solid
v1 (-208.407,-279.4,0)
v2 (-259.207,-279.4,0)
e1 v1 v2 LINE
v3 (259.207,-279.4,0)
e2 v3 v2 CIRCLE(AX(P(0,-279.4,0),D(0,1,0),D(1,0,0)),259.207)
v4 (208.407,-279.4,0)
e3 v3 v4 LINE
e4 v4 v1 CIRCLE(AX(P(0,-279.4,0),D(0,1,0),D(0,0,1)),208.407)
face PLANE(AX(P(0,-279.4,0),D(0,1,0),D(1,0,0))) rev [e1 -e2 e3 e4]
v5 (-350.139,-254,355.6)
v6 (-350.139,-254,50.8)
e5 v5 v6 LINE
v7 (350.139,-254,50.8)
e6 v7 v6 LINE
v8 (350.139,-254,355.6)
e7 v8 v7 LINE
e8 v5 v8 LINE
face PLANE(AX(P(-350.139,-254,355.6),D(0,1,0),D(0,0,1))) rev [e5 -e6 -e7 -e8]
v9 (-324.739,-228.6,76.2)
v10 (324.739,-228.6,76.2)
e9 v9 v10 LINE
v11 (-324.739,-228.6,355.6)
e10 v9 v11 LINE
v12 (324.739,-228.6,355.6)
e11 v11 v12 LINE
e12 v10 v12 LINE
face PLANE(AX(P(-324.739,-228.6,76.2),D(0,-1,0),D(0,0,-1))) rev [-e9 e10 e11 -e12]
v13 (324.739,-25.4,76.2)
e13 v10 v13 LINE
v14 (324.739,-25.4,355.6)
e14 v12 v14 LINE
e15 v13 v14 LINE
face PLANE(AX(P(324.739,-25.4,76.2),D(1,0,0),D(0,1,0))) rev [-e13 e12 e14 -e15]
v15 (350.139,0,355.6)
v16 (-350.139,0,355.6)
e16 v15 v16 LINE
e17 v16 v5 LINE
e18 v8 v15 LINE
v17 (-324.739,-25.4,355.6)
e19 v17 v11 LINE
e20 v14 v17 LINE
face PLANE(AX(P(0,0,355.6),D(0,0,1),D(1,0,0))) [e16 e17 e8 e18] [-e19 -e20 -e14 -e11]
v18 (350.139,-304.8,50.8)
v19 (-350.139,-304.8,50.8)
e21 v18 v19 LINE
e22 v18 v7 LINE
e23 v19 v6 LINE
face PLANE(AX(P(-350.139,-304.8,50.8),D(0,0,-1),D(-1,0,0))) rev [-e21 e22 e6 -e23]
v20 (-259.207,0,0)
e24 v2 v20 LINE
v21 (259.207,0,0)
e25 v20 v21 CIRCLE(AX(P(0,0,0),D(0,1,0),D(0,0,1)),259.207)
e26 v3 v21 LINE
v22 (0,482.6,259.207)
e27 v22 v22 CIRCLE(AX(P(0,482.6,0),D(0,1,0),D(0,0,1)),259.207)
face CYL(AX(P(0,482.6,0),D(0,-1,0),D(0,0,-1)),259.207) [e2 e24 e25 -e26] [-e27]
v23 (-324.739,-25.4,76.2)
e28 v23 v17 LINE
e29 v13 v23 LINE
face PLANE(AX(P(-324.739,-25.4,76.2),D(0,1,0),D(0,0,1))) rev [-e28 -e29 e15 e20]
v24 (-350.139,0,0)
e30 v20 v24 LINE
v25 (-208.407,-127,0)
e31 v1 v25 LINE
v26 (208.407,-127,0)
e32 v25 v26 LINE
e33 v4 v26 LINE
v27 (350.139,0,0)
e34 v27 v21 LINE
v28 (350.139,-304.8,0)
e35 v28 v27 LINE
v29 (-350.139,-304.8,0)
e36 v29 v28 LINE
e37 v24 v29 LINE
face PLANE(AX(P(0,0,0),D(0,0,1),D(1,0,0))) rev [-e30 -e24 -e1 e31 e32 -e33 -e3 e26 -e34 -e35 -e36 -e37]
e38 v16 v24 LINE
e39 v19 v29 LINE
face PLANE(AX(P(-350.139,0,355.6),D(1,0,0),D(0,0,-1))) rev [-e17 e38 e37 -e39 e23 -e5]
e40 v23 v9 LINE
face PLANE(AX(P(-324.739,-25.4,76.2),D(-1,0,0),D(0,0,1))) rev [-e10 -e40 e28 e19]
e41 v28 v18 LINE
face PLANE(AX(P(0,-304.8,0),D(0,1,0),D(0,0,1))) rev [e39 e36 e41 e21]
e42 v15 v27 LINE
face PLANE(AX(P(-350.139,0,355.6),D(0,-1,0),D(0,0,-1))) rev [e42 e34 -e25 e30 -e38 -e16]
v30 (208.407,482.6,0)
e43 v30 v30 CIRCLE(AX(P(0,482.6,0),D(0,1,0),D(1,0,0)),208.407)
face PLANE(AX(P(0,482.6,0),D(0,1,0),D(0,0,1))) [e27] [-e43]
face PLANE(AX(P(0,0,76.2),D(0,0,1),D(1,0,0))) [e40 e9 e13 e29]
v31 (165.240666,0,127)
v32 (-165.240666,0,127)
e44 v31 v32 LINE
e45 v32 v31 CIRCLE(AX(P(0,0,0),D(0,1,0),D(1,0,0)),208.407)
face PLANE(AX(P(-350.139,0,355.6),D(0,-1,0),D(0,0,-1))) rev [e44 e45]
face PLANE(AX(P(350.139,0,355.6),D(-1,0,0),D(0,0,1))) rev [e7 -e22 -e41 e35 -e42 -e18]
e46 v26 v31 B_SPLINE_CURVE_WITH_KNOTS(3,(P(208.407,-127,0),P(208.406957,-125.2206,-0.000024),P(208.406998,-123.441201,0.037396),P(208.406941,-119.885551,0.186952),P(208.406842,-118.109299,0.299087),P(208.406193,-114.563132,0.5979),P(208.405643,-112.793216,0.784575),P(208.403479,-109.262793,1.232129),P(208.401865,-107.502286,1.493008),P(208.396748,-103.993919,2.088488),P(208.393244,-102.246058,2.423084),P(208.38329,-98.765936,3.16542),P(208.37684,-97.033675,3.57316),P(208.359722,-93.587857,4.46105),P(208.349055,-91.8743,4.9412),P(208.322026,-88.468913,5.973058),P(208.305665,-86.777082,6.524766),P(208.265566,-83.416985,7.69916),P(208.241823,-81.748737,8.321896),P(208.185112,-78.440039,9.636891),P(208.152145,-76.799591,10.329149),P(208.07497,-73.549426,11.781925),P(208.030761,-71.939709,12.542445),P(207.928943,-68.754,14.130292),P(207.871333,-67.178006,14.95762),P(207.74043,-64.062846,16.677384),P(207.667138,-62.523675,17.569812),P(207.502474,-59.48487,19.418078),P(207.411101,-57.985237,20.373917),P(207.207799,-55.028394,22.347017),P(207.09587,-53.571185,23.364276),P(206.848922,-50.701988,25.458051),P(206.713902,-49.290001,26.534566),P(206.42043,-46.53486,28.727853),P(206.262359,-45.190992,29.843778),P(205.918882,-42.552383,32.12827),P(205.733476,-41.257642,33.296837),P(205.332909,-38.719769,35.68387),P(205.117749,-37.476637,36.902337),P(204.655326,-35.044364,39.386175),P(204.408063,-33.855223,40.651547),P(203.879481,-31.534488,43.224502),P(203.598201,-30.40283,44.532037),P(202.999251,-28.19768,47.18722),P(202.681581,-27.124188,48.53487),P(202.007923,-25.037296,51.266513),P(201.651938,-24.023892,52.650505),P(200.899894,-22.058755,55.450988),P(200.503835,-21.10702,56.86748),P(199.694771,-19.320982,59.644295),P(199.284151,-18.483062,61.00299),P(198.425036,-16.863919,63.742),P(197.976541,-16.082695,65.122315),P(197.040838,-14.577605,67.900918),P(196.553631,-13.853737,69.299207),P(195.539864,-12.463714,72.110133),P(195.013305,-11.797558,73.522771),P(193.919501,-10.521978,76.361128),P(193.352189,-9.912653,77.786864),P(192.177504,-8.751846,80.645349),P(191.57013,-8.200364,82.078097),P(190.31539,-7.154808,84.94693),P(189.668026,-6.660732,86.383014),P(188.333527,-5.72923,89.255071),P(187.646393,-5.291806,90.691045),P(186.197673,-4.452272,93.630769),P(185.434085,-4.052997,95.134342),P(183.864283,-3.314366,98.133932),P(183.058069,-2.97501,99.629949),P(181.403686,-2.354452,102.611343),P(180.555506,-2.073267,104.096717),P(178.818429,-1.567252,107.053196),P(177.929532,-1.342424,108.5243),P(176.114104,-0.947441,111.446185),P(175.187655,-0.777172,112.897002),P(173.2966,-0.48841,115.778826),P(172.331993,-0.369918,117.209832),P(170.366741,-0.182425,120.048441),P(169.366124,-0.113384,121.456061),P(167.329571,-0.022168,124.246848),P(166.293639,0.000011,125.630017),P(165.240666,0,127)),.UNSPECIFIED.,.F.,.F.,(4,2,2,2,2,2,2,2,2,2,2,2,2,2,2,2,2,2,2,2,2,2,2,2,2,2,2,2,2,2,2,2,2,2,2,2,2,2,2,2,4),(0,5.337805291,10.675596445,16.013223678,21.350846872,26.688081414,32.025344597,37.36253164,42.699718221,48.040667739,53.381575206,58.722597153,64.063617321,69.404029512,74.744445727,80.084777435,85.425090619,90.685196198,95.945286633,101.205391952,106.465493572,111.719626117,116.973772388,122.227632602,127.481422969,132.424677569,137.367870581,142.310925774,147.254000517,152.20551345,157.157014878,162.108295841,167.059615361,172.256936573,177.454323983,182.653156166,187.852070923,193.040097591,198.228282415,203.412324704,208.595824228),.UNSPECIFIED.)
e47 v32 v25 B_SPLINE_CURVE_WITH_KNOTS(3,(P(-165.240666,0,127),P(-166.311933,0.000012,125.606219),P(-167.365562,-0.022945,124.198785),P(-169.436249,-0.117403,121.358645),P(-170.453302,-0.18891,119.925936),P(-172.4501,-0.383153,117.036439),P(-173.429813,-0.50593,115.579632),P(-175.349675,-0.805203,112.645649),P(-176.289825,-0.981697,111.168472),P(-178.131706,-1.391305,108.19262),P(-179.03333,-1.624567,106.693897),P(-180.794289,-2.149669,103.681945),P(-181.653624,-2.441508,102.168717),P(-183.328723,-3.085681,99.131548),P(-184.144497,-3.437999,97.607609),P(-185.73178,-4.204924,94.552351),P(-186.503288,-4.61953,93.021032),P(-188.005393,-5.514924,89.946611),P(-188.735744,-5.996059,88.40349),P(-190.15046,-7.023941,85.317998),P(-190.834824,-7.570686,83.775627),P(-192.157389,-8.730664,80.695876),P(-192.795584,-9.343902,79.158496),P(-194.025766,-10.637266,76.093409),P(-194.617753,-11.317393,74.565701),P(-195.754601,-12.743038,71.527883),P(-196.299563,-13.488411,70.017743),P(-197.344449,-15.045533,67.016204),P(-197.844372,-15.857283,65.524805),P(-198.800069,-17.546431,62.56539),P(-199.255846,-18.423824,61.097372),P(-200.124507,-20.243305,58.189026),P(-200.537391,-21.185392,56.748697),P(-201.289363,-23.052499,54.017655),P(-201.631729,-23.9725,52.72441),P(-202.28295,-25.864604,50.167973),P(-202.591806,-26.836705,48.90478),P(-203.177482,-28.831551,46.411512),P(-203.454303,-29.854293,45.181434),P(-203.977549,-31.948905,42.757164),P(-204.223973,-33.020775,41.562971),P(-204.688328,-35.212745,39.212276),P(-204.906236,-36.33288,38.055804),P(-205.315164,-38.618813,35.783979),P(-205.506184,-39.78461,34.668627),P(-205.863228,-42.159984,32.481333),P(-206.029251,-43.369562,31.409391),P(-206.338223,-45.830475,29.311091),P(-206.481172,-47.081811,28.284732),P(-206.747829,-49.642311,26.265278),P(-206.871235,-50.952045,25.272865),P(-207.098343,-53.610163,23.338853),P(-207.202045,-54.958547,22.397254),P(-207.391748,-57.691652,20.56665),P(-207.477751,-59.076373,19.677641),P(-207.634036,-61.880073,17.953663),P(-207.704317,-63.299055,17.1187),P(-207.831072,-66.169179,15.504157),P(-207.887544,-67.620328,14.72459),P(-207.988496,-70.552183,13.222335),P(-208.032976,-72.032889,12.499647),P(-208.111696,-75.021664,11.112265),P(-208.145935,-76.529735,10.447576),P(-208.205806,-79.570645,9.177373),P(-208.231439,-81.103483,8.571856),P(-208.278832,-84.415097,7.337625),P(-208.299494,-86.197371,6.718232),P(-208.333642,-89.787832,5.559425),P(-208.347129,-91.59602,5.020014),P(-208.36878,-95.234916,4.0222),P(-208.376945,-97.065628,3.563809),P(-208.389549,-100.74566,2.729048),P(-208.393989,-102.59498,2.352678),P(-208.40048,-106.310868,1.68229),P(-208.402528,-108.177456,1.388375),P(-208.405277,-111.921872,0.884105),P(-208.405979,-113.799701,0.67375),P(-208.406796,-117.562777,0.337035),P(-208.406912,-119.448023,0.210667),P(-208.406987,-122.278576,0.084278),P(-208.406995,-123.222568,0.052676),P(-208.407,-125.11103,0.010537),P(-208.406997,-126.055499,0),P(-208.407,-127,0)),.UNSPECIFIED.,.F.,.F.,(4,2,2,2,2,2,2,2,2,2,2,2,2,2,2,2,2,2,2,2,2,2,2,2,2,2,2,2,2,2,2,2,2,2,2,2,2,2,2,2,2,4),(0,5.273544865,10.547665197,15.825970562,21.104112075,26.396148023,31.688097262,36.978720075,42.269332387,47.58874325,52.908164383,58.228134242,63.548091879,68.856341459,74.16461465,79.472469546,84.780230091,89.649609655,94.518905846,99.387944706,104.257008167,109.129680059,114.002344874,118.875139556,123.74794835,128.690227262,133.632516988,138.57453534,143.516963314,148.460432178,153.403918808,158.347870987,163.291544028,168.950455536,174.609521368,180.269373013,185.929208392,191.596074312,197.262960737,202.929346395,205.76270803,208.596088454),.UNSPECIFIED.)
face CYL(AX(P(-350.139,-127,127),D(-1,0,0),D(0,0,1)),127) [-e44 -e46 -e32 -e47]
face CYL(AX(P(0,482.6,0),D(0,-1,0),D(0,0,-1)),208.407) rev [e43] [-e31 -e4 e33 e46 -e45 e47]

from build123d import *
from build123d.topology import SkipClean

# Parameters (mm, degrees)
SKETCH_2_R          = 259.207
SKETCH_2_R_2        = 208.407
F_19MM_DEPTH        = 482.6
F_11MM_START        = -279.4
F_11MM_DEPTH        = 279.4
SKETCH_8_W          = 700.278
SKETCH_8_H          = 254
EXTRUDE_2_DEPTH     = 355.6
SKETCH_11_W         = 649.478
SKETCH_11_H         = 203.2
CUT_EXTRUDE_1_DEPTH = 279.4
FILLET_2_R          = 127
SKETCH_13_W         = 700.278
SKETCH_13_H         = 50.8
F_2MM_DEPTH         = 50.8


with BuildPart() as part:
    # 草圖2 → 主件固定 19mm (new body)
    with BuildSketch(Plane(origin=(0, 0, 0), x_dir=(1, 0, 0), z_dir=(0, 1, 0))):
        Circle(SKETCH_2_R)
        Circle(SKETCH_2_R_2, mode=Mode.SUBTRACT)
    extrude(amount=F_19MM_DEPTH)

    # 草圖3 → 下填充 11mm (add)
    with SkipClean():  # the faces are left unmerged after this step: merging them gives an invalid solid
        with BuildSketch(Plane(origin=(0, 0, 0), x_dir=(1, 0, 0), z_dir=(0, 1, 0)).offset(F_11MM_START)):
            with BuildLine():
                ThreePointArc((208.407, 0), (0, 208.407), (-208.407, 0))
                Line((-208.407, 0), (-259.207, 0))
                ThreePointArc((-259.207, 0), (0, 259.207), (259.207, 0))
                Line((259.207, 0), (208.407, 0))
            make_face()
        extrude(amount=F_11MM_DEPTH)

    # 草圖8 → 填料-伸長2 (add)
    with SkipClean():  # the faces are left unmerged after this step: merging them gives an invalid solid
        with BuildSketch(Plane.XY):
            with Locations((0, -127)):
                Rectangle(SKETCH_8_W, SKETCH_8_H)
        extrude(amount=EXTRUDE_2_DEPTH)

    # 草圖11 → 除料-伸長1 (cut)
    with SkipClean():  # the faces are left unmerged after this step: merging them gives an invalid solid
        with BuildSketch(Plane.XY.offset(355.6)):
            with Locations((0, -127)):
                Rectangle(SKETCH_11_W, SKETCH_11_H)
        extrude(amount=-CUT_EXTRUDE_1_DEPTH, mode=Mode.SUBTRACT)

    # 圓角2
    # the kernel refuses this fillet: 127 mm, written as the material it takes off along each edge
    with BuildSketch(Plane(origin=(-525.907, 0, 0), x_dir=(0, 0, 1), z_dir=(1, 0, 0))) as fillet_2_piece_1_section:
        with BuildLine():
            CenterArc((FILLET_2_R, FILLET_2_R), FILLET_2_R, 180, 90)
            Line((0, FILLET_2_R), (0, 0))
            Line((0, 0), (FILLET_2_R, 0))
        make_face()
    fillet_2_piece_1 = extrude(amount=1051.814, mode=Mode.PRIVATE)
    fillet_2_piece_1 = fillet_2_piece_1 & Plane(origin=(0, -28.656065258, 0), x_dir=(1, 0, 0), z_dir=(0, -1, 0)) * Cylinder(208.407, 2612, mode=Mode.PRIVATE)
    add(fillet_2_piece_1, mode=Mode.SUBTRACT)

    # 草圖13 → 防水凸出2mm (add)
    with BuildSketch(Plane.XZ.offset(254)):
        with Locations((0, 25.4)):
            Rectangle(SKETCH_13_W, SKETCH_13_H)
    extrude(amount=F_2MM_DEPTH)


solid = part.part
